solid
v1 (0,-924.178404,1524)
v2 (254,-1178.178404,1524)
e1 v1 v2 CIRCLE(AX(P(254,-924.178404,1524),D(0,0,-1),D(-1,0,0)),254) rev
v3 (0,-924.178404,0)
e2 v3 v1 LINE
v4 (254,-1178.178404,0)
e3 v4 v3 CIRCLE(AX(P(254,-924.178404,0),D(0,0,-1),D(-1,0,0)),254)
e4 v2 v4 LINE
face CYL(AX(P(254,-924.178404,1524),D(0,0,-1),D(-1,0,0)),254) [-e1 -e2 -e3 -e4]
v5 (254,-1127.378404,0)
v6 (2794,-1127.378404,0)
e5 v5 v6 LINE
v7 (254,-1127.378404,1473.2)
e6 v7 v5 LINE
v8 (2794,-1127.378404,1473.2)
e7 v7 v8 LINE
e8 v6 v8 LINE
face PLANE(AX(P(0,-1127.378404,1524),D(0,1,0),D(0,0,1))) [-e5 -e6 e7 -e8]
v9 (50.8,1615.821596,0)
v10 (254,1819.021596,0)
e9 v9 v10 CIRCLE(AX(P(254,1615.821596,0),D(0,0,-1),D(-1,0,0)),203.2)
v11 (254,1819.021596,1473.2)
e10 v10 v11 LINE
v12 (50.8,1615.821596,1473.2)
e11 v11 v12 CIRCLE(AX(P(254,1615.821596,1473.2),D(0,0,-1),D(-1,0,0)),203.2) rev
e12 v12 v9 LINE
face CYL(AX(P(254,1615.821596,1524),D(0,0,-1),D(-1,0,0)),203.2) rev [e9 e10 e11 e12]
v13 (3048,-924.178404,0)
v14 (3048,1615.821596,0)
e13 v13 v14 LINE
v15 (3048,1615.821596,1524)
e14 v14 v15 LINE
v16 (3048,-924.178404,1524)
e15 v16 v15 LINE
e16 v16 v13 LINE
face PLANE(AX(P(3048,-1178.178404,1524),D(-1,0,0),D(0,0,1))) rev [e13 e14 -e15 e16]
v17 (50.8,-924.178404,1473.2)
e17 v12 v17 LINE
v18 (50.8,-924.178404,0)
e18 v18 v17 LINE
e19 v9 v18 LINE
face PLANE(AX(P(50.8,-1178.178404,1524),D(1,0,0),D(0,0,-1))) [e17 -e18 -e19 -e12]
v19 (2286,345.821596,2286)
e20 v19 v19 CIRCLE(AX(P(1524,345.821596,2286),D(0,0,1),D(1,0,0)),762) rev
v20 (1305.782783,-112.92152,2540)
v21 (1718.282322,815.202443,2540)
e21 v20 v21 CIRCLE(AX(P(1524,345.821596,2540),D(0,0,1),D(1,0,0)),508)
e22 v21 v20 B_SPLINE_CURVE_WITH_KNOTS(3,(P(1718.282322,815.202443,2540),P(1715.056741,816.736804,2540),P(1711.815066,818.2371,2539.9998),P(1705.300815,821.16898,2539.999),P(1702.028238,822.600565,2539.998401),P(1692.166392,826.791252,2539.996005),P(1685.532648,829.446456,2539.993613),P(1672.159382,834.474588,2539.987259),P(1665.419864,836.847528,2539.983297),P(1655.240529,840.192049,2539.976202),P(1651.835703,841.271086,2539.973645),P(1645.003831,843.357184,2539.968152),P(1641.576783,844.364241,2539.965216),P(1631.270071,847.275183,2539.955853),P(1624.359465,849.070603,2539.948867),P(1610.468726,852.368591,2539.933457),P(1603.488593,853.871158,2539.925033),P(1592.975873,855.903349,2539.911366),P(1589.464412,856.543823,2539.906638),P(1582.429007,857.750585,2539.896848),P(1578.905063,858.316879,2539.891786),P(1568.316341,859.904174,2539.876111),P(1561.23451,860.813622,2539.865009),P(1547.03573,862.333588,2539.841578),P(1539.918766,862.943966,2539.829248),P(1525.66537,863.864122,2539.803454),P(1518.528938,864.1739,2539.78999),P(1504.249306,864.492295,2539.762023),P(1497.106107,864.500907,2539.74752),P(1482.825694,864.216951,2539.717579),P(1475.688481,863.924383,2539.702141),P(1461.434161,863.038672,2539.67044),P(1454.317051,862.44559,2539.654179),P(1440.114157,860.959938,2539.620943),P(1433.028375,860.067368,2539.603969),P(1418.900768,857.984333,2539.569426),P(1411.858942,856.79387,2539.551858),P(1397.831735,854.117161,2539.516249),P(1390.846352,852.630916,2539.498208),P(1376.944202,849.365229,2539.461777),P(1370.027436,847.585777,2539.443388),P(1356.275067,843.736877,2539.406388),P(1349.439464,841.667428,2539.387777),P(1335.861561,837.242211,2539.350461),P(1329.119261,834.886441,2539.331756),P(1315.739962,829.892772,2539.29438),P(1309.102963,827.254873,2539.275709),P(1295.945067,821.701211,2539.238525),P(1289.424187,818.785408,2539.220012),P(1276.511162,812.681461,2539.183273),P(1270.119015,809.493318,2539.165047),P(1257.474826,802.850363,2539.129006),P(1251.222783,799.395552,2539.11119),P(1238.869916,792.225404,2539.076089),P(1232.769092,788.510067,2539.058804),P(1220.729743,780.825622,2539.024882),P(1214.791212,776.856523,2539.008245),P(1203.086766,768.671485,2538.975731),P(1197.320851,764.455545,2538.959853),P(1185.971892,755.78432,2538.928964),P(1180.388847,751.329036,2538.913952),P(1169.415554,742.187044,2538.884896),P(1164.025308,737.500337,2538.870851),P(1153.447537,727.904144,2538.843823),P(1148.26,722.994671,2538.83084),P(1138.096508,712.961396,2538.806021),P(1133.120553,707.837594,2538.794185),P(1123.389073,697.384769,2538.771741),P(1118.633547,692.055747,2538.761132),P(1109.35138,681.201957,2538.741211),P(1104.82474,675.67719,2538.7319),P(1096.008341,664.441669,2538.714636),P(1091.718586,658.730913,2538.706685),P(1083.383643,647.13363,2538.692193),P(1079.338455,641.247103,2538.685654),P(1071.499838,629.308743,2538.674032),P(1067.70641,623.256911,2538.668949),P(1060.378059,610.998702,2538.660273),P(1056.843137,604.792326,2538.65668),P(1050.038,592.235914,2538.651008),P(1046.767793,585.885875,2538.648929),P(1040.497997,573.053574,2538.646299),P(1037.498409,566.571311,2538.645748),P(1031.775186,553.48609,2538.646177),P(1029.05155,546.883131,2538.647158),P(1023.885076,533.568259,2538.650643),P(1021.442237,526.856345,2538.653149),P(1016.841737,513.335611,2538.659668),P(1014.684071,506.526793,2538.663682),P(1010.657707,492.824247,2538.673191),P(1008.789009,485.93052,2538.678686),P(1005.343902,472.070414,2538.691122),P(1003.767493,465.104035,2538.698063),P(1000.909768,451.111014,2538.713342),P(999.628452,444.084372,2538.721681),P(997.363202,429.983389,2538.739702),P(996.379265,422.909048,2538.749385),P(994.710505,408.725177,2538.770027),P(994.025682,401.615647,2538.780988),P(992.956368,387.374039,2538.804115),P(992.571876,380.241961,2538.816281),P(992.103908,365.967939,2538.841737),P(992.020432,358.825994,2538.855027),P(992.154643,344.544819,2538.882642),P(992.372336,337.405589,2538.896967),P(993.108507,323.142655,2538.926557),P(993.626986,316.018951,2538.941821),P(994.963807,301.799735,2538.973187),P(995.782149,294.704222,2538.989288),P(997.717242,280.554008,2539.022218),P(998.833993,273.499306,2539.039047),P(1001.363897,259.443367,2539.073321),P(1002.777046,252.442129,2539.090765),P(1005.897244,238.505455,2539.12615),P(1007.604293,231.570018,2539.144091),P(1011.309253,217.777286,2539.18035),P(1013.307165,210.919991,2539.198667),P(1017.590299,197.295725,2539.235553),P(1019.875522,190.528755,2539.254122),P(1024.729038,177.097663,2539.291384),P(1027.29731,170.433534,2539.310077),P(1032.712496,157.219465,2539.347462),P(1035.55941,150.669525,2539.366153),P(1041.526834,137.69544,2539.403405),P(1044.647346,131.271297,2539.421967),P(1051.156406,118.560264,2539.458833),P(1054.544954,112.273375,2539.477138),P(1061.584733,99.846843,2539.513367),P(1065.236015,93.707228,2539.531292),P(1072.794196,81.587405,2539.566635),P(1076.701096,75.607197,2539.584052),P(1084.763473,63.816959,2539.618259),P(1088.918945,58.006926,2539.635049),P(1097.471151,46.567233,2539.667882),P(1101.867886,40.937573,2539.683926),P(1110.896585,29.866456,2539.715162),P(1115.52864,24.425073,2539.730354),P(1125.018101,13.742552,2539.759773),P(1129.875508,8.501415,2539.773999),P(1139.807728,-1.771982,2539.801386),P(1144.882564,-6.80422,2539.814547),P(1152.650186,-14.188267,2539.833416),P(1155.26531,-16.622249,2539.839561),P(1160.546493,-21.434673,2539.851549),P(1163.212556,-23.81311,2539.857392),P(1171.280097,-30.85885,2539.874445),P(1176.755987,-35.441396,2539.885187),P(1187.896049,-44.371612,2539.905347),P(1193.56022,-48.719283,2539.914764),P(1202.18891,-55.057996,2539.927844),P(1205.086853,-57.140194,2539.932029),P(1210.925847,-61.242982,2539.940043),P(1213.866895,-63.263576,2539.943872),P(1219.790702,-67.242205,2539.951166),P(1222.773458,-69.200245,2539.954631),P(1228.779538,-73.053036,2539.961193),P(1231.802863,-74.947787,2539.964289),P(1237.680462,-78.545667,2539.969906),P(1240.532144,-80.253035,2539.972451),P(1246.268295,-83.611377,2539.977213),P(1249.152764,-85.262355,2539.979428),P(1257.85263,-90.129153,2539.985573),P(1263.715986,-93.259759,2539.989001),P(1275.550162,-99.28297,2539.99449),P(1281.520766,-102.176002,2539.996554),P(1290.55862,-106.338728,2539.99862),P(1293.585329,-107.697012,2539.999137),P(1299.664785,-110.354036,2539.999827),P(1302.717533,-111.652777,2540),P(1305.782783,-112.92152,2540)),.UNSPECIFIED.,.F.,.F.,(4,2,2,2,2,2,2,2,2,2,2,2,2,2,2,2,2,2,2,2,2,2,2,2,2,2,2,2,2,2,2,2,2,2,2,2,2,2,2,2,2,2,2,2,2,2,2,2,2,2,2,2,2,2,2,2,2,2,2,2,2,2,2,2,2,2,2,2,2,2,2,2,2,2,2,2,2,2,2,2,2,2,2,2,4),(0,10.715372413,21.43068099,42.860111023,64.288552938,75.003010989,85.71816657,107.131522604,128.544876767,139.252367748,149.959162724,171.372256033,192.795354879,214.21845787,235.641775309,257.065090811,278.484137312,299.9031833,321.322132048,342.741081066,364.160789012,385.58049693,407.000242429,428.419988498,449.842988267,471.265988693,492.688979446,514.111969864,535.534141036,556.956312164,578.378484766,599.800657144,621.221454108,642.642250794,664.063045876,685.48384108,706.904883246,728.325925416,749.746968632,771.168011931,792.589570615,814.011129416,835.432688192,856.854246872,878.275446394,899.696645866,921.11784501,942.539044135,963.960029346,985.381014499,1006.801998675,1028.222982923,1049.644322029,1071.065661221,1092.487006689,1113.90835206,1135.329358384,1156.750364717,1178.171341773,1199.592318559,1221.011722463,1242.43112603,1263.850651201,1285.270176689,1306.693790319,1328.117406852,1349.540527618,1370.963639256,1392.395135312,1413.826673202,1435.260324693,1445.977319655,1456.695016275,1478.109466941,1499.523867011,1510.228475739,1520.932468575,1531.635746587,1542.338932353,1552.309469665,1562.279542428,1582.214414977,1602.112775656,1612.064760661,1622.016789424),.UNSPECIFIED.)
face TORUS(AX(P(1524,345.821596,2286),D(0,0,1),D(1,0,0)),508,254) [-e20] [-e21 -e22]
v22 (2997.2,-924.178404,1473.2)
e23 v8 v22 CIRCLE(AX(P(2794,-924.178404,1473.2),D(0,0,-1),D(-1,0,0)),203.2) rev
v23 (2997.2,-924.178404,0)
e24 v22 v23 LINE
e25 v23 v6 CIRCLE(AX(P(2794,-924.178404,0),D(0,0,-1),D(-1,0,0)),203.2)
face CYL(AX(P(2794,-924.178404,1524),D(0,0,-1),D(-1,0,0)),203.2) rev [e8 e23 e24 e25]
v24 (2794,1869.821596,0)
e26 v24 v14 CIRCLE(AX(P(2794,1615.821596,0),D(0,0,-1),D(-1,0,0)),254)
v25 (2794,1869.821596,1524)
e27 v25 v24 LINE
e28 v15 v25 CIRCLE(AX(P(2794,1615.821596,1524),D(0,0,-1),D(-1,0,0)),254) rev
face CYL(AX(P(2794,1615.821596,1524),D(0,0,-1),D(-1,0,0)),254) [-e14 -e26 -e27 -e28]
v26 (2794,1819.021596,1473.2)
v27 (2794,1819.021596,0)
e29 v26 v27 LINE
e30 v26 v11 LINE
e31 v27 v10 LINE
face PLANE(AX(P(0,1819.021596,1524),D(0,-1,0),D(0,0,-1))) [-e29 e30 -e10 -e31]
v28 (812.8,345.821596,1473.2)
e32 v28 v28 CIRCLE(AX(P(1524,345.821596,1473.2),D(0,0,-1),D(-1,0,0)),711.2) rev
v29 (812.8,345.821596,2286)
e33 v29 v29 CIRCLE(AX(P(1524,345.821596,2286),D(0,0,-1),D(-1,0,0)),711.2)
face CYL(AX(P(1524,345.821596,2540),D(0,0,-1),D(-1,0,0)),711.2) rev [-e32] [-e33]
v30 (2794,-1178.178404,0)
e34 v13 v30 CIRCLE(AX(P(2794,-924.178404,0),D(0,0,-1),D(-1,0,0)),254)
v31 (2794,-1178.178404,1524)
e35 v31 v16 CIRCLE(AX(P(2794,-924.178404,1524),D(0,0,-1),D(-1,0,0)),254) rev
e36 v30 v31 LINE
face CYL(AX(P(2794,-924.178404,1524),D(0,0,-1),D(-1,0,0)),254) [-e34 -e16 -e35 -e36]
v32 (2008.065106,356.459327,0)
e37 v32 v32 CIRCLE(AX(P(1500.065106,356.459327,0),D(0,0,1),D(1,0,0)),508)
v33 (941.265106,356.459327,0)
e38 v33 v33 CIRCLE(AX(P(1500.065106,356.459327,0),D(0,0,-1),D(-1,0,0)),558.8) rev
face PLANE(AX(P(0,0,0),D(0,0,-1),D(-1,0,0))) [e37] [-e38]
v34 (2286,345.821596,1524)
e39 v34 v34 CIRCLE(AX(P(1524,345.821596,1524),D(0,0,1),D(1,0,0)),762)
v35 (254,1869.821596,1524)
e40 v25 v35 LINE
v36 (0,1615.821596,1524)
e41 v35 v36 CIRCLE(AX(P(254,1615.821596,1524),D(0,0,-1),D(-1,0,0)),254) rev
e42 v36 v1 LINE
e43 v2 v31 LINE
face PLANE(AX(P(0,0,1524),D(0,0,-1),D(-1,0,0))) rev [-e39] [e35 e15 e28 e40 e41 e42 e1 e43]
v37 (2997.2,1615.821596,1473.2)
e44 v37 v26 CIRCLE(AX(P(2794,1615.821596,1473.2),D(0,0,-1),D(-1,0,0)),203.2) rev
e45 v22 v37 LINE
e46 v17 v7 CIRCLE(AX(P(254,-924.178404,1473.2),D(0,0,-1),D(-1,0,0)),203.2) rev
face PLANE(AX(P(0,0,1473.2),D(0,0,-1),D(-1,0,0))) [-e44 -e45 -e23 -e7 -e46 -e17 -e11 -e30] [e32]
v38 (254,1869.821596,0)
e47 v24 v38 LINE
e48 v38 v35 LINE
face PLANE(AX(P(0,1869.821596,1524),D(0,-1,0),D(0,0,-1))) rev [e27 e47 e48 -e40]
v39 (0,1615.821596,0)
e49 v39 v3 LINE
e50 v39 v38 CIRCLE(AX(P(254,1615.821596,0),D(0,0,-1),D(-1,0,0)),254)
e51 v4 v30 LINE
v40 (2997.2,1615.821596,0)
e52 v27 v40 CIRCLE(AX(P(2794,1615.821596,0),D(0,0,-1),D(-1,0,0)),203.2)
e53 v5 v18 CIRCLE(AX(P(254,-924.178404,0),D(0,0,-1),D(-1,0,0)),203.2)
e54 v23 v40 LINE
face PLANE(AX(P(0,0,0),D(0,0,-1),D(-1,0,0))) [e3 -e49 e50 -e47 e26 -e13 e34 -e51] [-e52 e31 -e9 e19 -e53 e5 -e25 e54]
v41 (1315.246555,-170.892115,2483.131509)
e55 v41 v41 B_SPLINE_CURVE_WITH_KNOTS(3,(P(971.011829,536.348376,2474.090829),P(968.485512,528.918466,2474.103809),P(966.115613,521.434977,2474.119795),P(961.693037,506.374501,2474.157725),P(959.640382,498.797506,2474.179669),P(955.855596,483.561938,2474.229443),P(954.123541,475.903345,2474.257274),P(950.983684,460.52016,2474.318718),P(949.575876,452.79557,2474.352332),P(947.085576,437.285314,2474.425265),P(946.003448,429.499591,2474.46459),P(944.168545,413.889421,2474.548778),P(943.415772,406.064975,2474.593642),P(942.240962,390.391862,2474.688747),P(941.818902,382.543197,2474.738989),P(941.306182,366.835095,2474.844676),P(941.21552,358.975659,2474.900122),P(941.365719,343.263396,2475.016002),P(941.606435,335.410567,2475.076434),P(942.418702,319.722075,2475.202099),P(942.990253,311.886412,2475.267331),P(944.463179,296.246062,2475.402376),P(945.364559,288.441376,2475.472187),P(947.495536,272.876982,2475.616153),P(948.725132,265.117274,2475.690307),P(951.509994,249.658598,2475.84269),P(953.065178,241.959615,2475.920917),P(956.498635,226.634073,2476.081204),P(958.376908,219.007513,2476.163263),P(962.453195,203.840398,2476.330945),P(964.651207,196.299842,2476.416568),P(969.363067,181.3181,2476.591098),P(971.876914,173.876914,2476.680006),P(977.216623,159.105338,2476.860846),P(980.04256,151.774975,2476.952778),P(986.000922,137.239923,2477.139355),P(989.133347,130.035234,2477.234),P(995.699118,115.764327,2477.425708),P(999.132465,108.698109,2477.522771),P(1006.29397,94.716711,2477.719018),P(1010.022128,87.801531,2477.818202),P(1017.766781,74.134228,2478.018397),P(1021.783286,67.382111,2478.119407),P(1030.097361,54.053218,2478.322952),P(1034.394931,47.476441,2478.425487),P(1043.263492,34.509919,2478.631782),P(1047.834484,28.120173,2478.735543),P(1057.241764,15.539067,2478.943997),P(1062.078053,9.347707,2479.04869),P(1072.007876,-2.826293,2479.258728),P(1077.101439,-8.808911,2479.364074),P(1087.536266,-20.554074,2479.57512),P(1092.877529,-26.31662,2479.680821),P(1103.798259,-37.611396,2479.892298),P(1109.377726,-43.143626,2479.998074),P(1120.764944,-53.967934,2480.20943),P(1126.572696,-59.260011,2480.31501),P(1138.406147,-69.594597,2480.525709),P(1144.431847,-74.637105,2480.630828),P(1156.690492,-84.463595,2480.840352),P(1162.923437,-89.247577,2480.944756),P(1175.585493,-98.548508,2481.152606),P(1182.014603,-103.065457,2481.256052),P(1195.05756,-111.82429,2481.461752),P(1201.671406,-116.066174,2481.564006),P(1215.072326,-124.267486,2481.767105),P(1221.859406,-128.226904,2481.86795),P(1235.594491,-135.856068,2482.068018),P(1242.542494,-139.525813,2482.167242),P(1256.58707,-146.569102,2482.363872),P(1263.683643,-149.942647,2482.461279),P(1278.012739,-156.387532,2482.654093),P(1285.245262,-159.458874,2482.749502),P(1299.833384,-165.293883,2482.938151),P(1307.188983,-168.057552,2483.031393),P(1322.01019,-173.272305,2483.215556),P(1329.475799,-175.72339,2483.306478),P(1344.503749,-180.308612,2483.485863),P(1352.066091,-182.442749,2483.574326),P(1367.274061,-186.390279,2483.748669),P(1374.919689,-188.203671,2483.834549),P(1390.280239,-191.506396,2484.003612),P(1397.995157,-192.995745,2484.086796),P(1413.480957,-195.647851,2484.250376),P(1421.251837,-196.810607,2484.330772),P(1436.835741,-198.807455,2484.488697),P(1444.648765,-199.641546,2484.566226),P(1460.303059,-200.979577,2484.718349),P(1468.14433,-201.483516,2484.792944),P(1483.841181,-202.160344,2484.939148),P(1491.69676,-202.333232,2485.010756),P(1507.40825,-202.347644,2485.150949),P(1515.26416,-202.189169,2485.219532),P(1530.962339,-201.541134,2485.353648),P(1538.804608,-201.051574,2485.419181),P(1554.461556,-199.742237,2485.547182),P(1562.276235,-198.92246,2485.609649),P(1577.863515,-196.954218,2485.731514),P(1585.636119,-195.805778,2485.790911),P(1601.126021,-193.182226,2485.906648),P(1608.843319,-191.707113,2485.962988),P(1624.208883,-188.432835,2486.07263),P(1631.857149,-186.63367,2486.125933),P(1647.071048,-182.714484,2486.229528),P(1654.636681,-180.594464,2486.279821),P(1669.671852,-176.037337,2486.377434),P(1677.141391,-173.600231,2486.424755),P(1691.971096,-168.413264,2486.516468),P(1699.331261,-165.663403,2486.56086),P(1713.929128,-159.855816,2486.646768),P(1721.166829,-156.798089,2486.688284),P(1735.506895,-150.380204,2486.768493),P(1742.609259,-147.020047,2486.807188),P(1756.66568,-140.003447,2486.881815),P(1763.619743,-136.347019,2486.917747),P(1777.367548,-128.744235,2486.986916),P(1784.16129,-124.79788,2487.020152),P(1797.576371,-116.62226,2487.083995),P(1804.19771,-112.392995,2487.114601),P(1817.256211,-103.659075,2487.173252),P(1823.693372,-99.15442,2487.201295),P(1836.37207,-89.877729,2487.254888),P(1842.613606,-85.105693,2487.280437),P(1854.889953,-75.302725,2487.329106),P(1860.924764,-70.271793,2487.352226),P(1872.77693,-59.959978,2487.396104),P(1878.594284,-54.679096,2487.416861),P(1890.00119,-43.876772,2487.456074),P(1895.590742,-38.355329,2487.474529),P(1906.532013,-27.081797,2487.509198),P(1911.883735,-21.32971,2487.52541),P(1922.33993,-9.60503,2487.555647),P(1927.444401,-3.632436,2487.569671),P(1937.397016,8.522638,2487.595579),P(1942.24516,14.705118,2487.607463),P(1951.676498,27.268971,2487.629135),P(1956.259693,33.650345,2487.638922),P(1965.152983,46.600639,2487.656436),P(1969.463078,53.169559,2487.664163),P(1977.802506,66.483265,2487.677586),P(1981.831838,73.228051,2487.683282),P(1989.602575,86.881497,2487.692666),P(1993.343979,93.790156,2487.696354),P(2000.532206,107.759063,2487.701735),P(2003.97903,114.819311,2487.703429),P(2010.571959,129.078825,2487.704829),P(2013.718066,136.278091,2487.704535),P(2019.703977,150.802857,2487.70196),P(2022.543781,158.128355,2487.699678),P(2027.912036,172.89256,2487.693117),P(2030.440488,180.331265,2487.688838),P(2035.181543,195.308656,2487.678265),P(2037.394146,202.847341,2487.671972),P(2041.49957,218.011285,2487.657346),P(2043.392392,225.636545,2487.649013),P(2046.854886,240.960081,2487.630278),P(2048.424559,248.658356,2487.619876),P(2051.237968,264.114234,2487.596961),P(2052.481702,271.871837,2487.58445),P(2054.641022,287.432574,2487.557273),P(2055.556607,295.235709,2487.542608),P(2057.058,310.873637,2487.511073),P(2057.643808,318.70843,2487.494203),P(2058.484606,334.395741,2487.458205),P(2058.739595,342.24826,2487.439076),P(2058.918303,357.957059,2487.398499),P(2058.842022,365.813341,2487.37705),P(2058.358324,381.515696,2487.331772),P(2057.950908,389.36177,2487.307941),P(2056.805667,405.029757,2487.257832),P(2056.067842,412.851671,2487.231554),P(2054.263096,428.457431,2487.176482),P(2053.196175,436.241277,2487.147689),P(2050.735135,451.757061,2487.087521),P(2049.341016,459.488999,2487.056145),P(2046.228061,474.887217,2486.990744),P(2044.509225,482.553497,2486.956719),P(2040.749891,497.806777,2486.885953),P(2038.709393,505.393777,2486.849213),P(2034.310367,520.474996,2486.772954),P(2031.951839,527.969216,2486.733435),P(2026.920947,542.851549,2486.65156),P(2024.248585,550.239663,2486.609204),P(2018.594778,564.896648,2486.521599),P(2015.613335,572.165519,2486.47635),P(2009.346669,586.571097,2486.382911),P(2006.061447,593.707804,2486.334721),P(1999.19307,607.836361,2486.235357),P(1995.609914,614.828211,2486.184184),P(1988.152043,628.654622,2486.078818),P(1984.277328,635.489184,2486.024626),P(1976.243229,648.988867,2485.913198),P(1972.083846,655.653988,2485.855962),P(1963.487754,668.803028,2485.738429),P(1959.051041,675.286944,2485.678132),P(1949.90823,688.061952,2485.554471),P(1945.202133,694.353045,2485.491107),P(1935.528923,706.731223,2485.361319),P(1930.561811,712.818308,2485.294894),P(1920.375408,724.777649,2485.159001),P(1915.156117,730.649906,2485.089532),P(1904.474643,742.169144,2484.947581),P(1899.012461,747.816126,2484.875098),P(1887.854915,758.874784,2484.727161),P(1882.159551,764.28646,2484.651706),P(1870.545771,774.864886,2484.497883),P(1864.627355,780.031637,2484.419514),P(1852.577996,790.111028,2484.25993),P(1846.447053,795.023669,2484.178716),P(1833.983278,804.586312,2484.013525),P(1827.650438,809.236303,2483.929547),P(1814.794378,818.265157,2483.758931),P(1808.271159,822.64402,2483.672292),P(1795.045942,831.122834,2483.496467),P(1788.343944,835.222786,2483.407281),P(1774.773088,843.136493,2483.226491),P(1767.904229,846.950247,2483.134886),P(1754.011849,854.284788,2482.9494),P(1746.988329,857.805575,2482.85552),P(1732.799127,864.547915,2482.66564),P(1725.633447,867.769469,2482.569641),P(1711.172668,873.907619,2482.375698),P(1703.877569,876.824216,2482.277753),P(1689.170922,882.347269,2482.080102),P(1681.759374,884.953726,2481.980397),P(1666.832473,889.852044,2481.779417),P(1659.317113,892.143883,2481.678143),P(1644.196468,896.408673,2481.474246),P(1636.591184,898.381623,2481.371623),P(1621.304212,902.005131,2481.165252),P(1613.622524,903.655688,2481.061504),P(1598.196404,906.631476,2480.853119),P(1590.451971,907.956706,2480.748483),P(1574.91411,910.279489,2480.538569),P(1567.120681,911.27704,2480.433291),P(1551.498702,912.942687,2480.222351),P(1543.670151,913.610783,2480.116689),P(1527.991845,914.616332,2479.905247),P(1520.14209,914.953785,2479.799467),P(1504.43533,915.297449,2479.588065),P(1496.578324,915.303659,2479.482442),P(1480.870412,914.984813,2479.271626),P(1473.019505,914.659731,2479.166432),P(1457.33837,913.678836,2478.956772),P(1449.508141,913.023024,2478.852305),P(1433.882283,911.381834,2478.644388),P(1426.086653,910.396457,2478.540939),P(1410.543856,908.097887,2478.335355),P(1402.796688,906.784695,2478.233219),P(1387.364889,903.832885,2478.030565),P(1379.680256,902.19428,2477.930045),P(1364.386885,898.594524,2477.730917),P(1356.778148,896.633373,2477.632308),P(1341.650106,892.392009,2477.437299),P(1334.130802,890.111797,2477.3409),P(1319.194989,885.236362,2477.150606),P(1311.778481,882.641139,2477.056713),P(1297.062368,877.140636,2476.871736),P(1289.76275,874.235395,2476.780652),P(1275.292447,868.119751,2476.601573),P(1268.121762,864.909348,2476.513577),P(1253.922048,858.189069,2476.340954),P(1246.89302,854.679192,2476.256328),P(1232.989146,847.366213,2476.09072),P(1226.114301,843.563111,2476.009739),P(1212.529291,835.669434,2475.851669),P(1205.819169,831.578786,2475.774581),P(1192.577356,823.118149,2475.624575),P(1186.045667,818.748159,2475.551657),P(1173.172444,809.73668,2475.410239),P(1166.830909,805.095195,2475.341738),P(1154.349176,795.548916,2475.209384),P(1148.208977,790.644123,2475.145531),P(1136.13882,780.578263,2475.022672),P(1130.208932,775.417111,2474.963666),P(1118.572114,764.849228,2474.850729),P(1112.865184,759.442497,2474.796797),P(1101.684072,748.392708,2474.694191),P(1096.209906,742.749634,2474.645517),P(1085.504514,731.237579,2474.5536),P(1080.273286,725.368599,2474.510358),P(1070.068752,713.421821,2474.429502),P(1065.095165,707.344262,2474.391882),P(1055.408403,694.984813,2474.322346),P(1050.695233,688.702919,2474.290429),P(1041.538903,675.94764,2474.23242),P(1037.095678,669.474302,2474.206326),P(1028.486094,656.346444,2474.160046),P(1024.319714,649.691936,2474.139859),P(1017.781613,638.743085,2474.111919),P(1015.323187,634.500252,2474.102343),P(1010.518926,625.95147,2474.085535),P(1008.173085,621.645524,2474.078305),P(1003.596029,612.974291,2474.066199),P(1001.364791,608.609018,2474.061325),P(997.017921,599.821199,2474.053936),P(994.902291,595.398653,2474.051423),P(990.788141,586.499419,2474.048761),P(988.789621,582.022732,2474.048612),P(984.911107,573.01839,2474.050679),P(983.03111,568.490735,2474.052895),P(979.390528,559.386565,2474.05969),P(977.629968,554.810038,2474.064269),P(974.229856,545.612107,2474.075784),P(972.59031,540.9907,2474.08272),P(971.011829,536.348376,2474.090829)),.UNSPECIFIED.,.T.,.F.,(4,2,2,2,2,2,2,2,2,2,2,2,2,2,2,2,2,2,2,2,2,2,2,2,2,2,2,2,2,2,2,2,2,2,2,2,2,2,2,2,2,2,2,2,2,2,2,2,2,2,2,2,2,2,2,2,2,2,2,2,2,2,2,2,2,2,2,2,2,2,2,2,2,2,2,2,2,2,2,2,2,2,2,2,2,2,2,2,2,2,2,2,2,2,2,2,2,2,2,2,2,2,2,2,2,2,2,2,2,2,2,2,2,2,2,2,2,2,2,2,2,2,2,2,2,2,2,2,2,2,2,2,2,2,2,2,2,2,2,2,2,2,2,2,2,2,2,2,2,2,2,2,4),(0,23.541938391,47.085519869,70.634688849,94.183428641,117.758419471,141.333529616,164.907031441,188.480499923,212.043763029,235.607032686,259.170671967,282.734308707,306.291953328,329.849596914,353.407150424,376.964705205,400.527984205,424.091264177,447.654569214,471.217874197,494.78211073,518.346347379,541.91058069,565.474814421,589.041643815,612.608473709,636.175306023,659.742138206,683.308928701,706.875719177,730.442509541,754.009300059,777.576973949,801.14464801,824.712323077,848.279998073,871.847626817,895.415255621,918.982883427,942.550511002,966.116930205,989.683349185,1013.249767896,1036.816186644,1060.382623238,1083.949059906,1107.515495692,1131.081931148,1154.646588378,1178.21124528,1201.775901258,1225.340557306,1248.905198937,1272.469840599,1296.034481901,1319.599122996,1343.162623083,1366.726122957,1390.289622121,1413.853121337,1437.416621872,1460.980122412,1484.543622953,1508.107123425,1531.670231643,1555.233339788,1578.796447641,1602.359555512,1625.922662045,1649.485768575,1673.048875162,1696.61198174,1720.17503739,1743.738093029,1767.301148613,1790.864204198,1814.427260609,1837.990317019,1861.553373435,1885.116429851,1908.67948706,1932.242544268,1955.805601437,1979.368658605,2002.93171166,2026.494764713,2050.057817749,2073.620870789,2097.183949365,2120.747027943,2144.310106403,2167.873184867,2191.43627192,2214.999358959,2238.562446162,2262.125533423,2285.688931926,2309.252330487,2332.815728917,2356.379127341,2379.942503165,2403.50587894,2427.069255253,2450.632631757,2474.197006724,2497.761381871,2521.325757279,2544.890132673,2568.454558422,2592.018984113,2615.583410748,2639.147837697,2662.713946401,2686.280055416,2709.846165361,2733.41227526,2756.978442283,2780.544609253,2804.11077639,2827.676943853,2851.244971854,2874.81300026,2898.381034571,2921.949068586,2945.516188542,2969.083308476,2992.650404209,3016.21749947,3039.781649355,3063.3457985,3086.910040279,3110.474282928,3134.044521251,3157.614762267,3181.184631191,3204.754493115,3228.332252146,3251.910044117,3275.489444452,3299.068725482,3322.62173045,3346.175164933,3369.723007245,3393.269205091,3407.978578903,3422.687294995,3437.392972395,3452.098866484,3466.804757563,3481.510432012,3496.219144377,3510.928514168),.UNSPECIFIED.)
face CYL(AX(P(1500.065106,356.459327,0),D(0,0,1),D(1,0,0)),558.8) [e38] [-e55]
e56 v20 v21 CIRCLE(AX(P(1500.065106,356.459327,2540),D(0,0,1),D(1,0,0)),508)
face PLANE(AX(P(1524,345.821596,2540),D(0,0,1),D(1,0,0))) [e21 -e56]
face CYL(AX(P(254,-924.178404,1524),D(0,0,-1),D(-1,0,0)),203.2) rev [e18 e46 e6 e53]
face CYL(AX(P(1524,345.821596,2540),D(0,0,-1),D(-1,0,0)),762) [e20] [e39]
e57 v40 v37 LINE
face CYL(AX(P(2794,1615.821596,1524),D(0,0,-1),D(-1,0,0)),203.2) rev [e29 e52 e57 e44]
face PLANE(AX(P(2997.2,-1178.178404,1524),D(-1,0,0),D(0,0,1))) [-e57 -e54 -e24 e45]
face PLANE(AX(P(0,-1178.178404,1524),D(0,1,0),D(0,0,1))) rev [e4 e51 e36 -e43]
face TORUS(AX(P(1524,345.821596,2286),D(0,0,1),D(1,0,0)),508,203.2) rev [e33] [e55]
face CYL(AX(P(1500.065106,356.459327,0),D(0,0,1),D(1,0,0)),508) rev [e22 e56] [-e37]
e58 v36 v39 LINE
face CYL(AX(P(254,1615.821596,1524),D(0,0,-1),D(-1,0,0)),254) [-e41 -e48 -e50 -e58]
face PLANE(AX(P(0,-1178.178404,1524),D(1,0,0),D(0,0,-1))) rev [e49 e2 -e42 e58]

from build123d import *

# Parameters (mm, degrees)
SKETCH2_W               = 3048
SKETCH2_H               = 3048
BOSS_EXTRUDE1_DEPTH     = 1524
SKETCH3_R               = 762
BOSS_EXTRUDE2_DEPTH     = 1016
CUT_EXTRUDE1_DEPTH      = 4387.130048435
CUT_EXTRUDE1_DEPTH_BACK = 4387.130048435
SKETCH8_R               = 508
FILLET1_R               = 254
SHELL1_T                = -50.8


with BuildPart() as part:
    # Sketch2 → Boss-Extrude1 (new body)
    with BuildSketch(Plane.XY):
        with Locations((1524, 345.821596244)):
            Rectangle(SKETCH2_W, SKETCH2_H)
    extrude(amount=BOSS_EXTRUDE1_DEPTH)

    # Sketch3 → Boss-Extrude2 (add)
    with BuildSketch(Plane.XY.offset(1524)):
        with Locations((1524, 345.821596244)):
            Circle(SKETCH3_R)
    extrude(amount=BOSS_EXTRUDE2_DEPTH)

    # Sketch8 → Cut-Extrude1 (cut, two sides: drawn at the far end of the back side and taken through both)
    with BuildSketch(Plane.XY.offset(2540).offset(-CUT_EXTRUDE1_DEPTH_BACK)):
        with Locations((1500.065105654, 356.459327065)):
            Circle(SKETCH8_R)
    extrude(amount=CUT_EXTRUDE1_DEPTH + CUT_EXTRUDE1_DEPTH_BACK, mode=Mode.SUBTRACT)

    # Fillet1
    # the kernel refuses this fillet: 254 mm, written as the material it takes off along each edge
    with BuildSketch(Plane(origin=(1524, 345.821596244, 2540), x_dir=(1, 0, 0), z_dir=(0, -1, 0))) as fillet1_piece_1:
        with BuildLine():
            CenterArc((762 - FILLET1_R, -FILLET1_R), FILLET1_R, 0, 90)
            Line((762 - FILLET1_R, 0), (762, 0))
            Line((762, 0), (762, -FILLET1_R))
        make_face()
    revolve(axis=Axis((1524, 345.821596244, 2540), (0, 0, 1)), mode=Mode.SUBTRACT)
    with BuildSketch(Plane(origin=(0, 1869.821596244, -635), x_dir=(0, -1, 0), z_dir=(0, 0, 1)), Plane(origin=(0, -1178.178403756, -635), x_dir=(1, 0, 0), z_dir=(0, 0, 1))) as fillet1_piece_2:
        with BuildLine():
            CenterArc((FILLET1_R, FILLET1_R), FILLET1_R, 180, 90)
            Line((0, FILLET1_R), (0, 0))
            Line((0, 0), (FILLET1_R, 0))
        make_face()
    extrude(amount=2794, mode=Mode.SUBTRACT)
    with BuildSketch(Plane(origin=(3048, 1869.821596244, -635), x_dir=(0, -1, 0), z_dir=(0, 0, 1)), Plane(origin=(3048, -1178.178403756, -635), x_dir=(-1, 0, 0), z_dir=(0, 0, 1))) as fillet1_piece_3:
        with BuildLine():
            CenterArc((FILLET1_R, -FILLET1_R), FILLET1_R, 90, 90)
            Line((0, -FILLET1_R), (0, 0))
            Line((0, 0), (FILLET1_R, 0))
        make_face()
    extrude(amount=2794, mode=Mode.SUBTRACT)

    # Shell1
    shell1_openings = [part.faces().sort_by_distance(p)[0] for p in [
        (104.874877579, -1073.303526177, 0),
    ]]
    offset(amount=SHELL1_T, openings=shell1_openings, kind=Kind.INTERSECTION)


solid = part.part
